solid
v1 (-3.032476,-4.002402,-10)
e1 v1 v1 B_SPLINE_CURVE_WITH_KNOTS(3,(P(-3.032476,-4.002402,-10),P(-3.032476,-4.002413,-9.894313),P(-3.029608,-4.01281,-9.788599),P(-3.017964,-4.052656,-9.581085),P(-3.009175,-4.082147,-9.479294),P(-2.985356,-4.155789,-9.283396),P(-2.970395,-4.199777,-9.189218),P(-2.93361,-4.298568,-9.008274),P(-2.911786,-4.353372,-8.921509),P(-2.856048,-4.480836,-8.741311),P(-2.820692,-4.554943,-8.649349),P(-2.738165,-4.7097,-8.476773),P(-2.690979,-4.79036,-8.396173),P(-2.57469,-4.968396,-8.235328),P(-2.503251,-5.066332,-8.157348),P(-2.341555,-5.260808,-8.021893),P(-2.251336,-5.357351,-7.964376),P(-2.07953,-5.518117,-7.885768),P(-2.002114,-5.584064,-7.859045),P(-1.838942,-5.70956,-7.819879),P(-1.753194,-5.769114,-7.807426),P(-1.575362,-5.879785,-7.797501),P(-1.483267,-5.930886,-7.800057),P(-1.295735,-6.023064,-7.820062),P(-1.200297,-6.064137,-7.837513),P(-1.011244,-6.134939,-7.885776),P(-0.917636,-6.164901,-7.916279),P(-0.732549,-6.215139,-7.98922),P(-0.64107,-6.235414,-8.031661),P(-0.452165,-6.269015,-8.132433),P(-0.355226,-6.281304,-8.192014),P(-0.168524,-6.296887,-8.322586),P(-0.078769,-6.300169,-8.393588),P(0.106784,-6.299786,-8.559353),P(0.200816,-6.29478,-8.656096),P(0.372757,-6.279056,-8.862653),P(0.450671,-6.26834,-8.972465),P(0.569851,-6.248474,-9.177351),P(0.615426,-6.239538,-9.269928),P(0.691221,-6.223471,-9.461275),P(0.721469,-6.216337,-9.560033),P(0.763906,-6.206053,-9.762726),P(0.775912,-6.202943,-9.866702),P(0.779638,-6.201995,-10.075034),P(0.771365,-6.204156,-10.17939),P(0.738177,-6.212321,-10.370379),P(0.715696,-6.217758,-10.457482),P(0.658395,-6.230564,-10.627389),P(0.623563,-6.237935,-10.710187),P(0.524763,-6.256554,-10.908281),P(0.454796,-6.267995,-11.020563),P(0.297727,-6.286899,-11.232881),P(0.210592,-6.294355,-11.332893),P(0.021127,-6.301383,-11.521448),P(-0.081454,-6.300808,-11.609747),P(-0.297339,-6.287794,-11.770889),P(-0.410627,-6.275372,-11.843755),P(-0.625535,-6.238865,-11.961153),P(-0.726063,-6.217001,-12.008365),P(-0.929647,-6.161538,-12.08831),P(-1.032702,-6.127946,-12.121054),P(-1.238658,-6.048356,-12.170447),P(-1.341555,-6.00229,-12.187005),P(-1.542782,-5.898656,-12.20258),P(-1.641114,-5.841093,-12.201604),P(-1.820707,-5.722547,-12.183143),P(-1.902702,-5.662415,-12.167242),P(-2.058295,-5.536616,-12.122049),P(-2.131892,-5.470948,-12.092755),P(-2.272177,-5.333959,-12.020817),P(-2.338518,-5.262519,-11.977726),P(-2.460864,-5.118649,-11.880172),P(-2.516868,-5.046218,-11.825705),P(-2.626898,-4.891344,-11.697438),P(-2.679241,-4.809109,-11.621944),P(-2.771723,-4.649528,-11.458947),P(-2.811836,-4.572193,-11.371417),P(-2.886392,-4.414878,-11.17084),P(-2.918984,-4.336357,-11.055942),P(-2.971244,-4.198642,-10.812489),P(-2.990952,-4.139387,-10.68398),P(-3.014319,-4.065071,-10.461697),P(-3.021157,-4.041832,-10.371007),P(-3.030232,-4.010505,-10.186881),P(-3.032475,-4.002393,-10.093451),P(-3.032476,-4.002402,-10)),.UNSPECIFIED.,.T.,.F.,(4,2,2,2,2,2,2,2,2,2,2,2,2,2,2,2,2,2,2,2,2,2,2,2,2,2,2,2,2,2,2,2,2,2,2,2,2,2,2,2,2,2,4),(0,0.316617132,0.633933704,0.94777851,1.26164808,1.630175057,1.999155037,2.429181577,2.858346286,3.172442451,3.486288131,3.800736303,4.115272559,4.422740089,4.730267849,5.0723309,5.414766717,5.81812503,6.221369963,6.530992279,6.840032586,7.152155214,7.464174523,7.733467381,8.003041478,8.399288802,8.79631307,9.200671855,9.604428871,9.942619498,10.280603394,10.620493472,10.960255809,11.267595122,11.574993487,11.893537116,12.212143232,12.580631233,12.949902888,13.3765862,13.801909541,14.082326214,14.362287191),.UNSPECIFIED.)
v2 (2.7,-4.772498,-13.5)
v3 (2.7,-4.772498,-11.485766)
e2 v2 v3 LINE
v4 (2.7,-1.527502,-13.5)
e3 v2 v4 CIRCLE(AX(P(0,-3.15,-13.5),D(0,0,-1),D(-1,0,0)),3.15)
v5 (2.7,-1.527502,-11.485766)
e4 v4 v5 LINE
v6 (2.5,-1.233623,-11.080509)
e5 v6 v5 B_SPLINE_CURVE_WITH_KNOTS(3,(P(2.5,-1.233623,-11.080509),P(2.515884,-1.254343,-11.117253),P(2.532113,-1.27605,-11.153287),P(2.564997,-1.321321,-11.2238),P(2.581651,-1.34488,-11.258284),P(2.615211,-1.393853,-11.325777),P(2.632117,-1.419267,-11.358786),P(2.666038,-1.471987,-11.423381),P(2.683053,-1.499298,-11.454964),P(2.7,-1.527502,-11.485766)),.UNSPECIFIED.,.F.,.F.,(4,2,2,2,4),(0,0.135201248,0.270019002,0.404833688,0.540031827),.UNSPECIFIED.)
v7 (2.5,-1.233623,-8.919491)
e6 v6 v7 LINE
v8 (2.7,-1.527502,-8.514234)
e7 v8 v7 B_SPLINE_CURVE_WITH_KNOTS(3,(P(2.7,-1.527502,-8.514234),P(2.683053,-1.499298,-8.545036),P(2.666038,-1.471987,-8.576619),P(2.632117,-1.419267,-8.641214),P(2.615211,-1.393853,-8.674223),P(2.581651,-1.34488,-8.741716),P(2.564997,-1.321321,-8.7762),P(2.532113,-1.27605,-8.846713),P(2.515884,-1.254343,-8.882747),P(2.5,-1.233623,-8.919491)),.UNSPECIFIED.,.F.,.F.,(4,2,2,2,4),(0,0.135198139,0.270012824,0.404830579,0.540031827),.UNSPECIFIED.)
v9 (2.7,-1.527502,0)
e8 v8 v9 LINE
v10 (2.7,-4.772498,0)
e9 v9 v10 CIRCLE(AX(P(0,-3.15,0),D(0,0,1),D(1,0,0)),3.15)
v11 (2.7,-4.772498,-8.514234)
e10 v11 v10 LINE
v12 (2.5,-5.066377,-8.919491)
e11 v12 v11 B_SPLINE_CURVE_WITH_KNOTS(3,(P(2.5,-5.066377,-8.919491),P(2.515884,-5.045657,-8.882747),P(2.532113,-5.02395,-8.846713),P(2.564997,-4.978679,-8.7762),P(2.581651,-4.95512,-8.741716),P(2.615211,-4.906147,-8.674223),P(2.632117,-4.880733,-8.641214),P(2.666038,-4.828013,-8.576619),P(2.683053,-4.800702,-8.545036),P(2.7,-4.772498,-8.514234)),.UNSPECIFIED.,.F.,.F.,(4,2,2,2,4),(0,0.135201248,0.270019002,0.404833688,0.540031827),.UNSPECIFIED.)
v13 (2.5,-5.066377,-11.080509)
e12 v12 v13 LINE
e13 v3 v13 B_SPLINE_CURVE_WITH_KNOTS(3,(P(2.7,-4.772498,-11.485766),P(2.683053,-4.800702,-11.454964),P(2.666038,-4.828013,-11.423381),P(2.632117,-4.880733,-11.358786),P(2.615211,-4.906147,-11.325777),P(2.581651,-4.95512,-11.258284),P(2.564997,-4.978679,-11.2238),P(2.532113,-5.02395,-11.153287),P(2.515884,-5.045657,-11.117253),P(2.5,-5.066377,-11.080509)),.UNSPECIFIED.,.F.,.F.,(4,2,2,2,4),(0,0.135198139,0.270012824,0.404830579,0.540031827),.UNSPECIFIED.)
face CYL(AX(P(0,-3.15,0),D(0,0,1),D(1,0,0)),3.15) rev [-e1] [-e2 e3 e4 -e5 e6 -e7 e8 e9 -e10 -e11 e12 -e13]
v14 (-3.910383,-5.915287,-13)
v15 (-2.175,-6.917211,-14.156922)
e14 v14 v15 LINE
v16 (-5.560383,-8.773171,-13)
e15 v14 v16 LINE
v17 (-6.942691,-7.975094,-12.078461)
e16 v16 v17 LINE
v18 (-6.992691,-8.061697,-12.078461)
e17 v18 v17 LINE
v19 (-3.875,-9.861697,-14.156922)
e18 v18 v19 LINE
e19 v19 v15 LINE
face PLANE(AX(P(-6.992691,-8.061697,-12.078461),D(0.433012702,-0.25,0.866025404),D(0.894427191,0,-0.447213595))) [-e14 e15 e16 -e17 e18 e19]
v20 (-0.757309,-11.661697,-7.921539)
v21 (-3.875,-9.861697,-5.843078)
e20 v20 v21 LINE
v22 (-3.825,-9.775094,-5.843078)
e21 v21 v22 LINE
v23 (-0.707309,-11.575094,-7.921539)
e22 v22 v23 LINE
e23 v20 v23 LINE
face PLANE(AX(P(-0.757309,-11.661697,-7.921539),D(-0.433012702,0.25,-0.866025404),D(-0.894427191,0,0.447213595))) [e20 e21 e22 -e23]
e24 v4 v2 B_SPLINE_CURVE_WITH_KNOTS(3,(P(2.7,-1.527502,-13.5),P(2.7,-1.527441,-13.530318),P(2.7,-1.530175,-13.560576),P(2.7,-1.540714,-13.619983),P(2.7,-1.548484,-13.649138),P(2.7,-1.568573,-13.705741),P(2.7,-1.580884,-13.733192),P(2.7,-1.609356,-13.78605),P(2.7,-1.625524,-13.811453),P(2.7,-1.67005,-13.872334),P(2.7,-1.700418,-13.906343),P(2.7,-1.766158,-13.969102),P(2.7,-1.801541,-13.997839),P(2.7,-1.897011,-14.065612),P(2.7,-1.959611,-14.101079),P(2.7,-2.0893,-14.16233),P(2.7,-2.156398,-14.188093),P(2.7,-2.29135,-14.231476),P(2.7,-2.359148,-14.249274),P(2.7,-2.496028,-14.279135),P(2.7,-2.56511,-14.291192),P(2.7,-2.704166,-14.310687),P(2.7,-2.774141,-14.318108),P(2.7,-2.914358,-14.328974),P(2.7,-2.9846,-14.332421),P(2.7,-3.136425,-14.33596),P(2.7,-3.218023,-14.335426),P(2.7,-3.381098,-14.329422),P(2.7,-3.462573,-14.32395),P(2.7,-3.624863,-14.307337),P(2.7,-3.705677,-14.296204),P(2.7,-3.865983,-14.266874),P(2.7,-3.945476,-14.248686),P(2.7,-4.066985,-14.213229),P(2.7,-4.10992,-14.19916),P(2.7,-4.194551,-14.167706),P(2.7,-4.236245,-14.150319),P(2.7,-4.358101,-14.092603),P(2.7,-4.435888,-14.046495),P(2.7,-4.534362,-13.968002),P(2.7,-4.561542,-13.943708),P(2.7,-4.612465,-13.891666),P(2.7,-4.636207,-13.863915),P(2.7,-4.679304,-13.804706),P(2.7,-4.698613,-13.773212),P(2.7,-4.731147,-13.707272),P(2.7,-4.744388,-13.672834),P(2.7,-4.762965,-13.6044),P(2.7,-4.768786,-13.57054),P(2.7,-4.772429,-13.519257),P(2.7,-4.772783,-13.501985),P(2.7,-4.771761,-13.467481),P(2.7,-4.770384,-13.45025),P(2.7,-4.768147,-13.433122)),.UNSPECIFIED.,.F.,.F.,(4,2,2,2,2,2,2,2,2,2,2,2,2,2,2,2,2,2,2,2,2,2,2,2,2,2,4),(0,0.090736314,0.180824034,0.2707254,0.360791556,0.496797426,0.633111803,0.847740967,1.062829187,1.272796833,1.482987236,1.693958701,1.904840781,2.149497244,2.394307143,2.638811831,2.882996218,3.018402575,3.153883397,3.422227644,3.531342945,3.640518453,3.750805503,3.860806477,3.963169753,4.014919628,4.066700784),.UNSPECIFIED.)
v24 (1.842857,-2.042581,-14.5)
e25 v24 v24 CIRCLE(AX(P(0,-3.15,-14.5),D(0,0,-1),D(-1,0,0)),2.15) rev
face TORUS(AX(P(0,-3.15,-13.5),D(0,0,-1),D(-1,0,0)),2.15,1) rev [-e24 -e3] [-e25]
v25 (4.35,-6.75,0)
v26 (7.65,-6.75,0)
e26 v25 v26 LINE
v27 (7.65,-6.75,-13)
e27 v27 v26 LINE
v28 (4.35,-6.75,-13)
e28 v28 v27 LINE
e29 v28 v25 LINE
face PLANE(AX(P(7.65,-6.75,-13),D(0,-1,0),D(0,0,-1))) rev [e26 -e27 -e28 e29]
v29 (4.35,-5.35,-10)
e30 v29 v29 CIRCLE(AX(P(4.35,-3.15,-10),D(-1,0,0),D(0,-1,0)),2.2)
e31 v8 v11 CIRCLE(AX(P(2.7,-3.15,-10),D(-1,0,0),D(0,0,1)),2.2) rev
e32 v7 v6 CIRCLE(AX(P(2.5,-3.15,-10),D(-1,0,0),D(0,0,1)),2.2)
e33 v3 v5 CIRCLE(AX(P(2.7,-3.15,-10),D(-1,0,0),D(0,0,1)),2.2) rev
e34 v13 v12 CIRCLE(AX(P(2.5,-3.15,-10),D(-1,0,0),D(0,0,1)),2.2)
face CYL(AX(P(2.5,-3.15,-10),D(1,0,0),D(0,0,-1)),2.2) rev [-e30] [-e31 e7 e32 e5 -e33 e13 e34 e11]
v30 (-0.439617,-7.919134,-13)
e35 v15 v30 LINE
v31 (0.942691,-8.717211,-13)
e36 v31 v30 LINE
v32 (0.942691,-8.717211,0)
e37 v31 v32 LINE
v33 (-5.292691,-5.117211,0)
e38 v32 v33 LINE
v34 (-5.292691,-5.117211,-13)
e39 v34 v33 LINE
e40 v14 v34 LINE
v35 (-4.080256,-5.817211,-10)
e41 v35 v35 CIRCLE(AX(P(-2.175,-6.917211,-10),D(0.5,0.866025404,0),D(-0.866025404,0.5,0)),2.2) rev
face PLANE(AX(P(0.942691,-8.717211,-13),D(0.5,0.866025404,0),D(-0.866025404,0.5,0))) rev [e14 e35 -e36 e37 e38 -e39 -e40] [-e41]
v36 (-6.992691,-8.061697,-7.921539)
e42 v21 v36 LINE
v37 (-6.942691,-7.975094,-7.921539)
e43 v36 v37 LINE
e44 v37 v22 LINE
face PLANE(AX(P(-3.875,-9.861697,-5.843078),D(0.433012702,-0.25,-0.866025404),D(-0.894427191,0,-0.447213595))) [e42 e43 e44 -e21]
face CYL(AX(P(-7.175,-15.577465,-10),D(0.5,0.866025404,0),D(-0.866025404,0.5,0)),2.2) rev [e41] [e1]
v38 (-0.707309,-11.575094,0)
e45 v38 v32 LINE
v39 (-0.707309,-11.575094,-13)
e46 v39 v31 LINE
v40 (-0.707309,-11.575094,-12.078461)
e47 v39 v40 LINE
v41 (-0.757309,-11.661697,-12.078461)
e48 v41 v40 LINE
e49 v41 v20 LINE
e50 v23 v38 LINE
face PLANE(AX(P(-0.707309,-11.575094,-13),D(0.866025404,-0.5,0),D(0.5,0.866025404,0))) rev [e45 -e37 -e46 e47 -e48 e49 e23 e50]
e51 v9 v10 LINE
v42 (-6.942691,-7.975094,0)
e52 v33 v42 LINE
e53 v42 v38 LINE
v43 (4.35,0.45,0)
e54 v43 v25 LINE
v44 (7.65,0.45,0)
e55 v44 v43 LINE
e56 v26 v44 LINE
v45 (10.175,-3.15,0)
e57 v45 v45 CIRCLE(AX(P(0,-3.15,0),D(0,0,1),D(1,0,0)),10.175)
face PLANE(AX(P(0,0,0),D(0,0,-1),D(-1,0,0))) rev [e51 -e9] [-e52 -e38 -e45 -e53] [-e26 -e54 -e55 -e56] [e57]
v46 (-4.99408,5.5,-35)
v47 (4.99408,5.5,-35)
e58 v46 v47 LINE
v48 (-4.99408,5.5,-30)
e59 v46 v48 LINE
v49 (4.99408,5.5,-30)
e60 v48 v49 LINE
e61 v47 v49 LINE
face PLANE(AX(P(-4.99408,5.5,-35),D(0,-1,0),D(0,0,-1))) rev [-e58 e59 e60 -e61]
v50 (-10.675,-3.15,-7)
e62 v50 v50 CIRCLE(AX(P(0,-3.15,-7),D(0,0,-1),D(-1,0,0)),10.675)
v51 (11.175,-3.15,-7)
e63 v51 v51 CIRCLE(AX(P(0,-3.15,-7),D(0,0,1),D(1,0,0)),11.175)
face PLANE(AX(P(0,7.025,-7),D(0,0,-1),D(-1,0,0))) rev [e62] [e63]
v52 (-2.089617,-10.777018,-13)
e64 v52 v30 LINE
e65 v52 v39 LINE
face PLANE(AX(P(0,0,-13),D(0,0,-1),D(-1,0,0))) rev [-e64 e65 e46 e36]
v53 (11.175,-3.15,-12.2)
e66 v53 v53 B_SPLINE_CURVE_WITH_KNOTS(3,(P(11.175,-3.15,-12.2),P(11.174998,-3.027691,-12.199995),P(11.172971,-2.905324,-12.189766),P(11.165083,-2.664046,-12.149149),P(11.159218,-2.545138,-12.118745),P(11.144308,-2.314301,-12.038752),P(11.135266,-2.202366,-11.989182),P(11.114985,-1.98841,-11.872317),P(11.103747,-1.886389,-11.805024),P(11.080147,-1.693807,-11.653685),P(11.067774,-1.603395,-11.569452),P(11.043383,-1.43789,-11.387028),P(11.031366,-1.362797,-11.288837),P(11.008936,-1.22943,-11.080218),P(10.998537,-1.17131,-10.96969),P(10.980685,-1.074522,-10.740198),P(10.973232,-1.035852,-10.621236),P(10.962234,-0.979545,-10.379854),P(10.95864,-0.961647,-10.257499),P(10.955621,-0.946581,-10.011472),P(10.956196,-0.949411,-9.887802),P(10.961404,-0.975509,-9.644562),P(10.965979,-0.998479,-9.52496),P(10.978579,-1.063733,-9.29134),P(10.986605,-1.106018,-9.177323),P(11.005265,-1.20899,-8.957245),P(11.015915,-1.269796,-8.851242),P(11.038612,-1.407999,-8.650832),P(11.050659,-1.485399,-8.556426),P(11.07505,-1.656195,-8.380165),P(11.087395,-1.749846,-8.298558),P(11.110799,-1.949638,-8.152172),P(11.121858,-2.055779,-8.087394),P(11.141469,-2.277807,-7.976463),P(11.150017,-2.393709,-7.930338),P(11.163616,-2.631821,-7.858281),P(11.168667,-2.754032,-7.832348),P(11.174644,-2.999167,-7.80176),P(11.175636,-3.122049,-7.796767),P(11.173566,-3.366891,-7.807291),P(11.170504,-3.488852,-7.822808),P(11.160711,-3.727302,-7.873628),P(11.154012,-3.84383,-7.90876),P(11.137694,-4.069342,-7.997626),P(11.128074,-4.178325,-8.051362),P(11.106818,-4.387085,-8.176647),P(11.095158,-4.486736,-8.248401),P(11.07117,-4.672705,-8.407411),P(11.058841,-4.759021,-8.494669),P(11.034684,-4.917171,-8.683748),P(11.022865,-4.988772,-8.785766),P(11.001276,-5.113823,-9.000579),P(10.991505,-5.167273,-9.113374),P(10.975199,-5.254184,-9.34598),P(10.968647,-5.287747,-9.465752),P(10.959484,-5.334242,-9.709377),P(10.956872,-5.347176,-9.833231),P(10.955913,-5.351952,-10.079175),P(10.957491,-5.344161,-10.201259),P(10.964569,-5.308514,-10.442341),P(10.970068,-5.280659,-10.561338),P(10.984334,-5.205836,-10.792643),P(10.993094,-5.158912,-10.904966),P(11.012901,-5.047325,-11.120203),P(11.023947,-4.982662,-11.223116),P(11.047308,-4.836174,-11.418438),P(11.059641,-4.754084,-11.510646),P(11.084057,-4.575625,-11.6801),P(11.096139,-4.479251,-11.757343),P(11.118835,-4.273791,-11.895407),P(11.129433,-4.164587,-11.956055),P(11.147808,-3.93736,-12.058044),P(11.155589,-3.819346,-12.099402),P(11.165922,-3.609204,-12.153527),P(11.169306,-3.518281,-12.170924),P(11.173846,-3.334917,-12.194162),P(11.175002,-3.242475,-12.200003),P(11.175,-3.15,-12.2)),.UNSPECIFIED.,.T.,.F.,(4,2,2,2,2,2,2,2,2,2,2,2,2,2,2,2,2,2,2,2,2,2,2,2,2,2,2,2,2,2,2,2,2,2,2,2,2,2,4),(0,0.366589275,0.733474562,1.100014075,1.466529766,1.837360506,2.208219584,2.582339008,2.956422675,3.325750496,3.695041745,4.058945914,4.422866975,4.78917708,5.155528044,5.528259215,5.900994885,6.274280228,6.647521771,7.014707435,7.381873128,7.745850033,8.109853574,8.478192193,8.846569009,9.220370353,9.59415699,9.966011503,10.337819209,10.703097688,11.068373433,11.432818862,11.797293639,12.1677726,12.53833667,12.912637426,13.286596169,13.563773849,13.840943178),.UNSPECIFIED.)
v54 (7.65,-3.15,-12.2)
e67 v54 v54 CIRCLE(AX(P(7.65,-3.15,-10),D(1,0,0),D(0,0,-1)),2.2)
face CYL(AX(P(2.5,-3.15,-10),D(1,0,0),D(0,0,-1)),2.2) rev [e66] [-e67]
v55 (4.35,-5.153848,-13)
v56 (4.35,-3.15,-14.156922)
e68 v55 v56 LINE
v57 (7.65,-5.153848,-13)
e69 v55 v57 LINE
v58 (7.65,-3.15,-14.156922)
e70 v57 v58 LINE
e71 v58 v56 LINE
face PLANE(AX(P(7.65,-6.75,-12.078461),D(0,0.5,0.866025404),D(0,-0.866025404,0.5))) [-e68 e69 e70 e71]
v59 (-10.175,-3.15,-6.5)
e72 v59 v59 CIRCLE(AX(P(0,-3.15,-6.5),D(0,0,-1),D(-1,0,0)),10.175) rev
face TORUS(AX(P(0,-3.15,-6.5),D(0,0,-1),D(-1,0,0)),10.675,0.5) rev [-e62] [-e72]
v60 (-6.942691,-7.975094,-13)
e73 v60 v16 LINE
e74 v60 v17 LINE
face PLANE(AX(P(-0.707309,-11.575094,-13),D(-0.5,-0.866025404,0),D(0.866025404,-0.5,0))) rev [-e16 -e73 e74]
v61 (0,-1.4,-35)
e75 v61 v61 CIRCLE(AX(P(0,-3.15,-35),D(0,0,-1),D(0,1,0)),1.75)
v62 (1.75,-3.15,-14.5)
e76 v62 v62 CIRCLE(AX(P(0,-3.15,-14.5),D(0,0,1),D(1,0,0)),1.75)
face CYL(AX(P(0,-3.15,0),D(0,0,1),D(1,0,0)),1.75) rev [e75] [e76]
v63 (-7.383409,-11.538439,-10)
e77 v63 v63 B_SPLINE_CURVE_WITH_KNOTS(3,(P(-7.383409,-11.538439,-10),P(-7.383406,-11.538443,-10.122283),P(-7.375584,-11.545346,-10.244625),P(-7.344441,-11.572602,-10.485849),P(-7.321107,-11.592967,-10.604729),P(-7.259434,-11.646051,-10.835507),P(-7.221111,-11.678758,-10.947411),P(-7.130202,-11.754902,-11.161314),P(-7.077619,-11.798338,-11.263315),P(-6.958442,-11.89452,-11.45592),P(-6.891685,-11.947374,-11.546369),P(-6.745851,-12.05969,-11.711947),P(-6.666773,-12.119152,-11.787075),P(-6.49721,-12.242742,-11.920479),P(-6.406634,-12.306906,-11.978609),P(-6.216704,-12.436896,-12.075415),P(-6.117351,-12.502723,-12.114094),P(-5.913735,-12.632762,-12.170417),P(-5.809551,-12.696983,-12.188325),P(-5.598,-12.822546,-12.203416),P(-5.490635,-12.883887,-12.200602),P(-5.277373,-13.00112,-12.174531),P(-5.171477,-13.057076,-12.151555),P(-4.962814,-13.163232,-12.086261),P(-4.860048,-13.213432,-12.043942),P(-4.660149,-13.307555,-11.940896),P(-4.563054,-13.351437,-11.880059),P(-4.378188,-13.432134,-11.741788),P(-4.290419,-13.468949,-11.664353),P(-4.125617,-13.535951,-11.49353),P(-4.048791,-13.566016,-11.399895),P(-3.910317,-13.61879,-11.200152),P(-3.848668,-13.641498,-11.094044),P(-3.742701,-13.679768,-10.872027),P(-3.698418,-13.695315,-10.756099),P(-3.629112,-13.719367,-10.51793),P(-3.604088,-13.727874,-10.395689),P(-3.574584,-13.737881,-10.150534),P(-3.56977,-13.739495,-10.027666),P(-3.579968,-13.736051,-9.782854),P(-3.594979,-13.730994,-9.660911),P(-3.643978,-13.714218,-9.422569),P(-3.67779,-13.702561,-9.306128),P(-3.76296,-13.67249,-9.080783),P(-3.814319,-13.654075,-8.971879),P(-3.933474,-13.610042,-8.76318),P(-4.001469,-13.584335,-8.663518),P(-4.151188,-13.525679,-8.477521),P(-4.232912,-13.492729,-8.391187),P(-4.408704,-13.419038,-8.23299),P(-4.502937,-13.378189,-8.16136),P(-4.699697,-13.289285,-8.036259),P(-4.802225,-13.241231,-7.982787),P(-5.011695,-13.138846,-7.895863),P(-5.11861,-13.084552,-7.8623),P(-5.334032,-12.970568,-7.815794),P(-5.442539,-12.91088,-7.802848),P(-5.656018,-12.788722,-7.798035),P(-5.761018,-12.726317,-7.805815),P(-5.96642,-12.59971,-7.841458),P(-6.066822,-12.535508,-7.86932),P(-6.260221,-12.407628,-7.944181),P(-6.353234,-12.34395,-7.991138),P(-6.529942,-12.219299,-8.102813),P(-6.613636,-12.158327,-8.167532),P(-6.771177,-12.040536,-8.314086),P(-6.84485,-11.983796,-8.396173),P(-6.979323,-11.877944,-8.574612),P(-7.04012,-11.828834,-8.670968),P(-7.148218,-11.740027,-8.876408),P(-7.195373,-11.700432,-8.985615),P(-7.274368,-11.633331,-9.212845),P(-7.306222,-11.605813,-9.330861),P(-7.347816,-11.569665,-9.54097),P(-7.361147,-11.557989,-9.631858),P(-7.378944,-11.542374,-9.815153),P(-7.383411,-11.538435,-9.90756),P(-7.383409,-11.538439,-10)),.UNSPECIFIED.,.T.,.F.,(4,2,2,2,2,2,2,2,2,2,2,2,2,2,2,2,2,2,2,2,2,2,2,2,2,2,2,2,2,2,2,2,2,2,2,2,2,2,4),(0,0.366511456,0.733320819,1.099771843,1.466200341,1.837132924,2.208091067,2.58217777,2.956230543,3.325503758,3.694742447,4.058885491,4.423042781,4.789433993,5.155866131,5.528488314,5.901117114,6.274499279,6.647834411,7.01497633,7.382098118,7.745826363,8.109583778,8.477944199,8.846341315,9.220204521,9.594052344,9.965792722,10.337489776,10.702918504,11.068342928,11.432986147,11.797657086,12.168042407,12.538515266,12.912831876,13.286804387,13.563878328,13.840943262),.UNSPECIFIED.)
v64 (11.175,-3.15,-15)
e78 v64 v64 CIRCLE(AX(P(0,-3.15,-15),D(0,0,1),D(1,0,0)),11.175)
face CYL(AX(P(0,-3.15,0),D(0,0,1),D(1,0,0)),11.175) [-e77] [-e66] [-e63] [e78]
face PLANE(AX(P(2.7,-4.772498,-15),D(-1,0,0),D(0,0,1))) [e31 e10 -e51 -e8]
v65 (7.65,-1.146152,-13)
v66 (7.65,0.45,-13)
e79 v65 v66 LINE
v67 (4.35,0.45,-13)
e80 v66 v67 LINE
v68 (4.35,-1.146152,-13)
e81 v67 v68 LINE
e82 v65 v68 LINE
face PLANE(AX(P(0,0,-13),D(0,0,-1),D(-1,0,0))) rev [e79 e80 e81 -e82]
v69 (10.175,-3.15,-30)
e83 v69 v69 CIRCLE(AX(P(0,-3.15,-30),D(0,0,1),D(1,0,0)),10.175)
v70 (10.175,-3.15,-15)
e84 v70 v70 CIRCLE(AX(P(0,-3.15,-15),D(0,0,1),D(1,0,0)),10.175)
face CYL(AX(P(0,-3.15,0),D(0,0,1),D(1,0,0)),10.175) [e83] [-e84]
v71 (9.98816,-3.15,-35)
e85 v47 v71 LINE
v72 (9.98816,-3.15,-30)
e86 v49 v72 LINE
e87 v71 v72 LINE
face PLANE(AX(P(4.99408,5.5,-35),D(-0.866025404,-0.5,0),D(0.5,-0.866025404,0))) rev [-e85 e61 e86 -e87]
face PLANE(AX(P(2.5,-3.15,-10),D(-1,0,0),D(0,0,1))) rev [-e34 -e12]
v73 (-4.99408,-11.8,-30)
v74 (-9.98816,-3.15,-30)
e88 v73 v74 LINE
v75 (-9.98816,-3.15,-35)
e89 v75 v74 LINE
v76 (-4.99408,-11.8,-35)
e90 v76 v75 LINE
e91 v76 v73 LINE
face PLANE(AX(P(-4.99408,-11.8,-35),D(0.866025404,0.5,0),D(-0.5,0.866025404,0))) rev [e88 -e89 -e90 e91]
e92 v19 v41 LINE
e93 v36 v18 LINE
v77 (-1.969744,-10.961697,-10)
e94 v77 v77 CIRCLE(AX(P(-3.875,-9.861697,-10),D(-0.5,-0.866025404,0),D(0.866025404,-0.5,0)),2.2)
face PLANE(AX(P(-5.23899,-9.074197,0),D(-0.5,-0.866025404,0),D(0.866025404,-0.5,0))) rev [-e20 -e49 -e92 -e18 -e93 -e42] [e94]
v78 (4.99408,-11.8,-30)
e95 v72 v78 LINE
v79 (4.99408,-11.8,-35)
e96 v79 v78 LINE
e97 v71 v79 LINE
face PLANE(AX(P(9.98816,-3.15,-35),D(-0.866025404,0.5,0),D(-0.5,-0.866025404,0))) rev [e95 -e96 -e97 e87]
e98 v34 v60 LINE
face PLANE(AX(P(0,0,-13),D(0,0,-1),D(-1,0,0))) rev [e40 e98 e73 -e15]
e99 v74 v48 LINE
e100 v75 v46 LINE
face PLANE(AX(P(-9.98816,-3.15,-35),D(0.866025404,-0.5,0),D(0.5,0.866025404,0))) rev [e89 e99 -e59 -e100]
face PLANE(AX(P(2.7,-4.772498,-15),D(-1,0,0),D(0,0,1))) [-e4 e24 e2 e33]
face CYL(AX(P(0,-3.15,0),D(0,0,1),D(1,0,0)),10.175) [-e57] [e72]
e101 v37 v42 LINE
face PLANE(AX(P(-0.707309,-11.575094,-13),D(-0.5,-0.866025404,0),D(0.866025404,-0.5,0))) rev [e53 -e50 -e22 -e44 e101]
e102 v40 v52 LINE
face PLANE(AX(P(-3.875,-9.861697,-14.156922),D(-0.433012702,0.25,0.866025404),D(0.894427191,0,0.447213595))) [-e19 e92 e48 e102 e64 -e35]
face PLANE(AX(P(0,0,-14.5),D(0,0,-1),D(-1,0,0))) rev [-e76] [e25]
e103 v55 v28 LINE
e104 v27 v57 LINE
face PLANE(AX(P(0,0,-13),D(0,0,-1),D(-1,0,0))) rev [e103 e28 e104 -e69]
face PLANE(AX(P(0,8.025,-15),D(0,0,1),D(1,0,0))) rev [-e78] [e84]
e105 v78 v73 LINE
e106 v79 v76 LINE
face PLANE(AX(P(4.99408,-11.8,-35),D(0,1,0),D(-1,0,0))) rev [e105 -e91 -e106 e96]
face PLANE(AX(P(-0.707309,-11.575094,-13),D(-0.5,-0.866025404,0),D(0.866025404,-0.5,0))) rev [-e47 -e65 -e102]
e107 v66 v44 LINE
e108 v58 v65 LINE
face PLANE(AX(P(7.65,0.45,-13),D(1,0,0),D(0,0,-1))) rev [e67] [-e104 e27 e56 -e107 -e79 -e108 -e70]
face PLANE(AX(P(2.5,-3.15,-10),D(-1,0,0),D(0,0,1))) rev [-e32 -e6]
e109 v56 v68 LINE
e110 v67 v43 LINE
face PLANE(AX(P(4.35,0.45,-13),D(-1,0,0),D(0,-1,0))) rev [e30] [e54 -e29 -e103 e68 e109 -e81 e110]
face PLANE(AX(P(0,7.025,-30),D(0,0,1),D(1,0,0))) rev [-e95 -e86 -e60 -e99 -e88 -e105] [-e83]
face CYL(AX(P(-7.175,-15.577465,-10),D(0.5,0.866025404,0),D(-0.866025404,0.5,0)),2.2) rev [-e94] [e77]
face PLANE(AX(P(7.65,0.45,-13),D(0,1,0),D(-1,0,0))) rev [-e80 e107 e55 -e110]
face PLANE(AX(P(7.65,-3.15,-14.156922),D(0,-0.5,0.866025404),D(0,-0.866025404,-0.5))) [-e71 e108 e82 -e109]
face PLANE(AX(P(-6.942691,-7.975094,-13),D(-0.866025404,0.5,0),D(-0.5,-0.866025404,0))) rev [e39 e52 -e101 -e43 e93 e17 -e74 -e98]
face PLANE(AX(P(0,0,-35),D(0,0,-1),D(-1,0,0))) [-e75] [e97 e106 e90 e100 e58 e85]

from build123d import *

# Parameters (mm, degrees)
SKETCH_2_R               = 1.75
EXTRUDE_1_DEPTH          = 5
SKETCH_3_W               = 2.5
SKETCH_3_H               = 7.4
EXTRUDE_2_DEPTH          = 15
CUT_EXTRUDE_1_DEPTH      = 0.2
CUT_EXTRUDE_1_DEPTH_BACK = 12
SKETCH_4_R               = 2.2
SKETCH_9_W               = 3.3
SKETCH_9_H               = 7.2
CUT_EXTRUDE_5_DEPTH      = 13
CUT_EXTRUDE_6_DEPTH      = 3.3
CUT_EXTRUDE_7_DEPTH      = 10
CUT_EXTRUDE_7_DEPTH_BACK = 5
SKETCH_12_R              = 2.2
CUT_EXTRUDE_8_DEPTH      = 3.4
FILLET_2_R               = 0.5


with BuildPart() as part:
    # Эскиз1 → Повернуть1 (revolve)
    with BuildSketch(Plane(origin=(0, 0, 0), x_dir=(0, 0, -1), z_dir=(1, 0, 0)), mode=Mode.PRIVATE) as revolve_1_sk:
        Polygon((0, 0), (0, 7.025), (7, 7.025), (7, 8.025), (15, 8.025), (15, 7.025), (30, 7.025), (30, -1.4), (14.5, -1.4), (14.5, 0), align=None)
    revolve(revolve_1_sk.sketch.rotate(Axis((0, -3.15, 0), (0, 0, -1)), 90), axis=Axis((0, -3.15, 0), (0, 0, -1)))

    # Эскиз2 → Бобышка-Вытянуть1 (add)
    with BuildSketch(Plane(origin=(0, 0, -30), x_dir=(-1, 0, 0), z_dir=(0, 0, -1))):
        Polygon((4.994079828, 5.5), (-4.994079828, 5.5), (-9.988159657, -3.15), (-4.994079828, -11.8), (4.994079828, -11.8), (9.988159657, -3.15), align=None)
        with Locations(Location((0, -3.15, 0), (0, 0, 180))):
            Circle(SKETCH_2_R, mode=Mode.SUBTRACT)
    extrude(amount=EXTRUDE_1_DEPTH)

    # Эскиз3 → Бобышка-Вытянуть2 (add)
    with BuildSketch(Plane.XY):
        with BuildLine():
            Line((2.7, -4.772498074), (2.7, -1.527501926))
            ThreePointArc((2.7, -1.527501926), (3.15, -3.15), (2.7, -4.772498074))
        make_face()
        with Locations((5.7, -3.15)):
            Rectangle(SKETCH_3_W, SKETCH_3_H)
    extrude(amount=-EXTRUDE_2_DEPTH)

    # Эскиз4 → Вырез-Вытянуть1 (cut, two sides: drawn at the far end of the back side and taken through both)
    with BuildSketch(Plane.ZY.offset(-2.7).offset(-CUT_EXTRUDE_1_DEPTH_BACK)):
        with Locations(Location((-10, -3.15, 0), (0, 0, 180))):
            Circle(SKETCH_4_R)
    extrude(amount=CUT_EXTRUDE_1_DEPTH + CUT_EXTRUDE_1_DEPTH_BACK, mode=Mode.SUBTRACT)

    # Скругление1: read off the stored shape, not the designer's step
    # Скругление1 outline → Скругление1 (revolve)
    with BuildSketch(Plane.XZ.offset(3.15)):
        with BuildLine():
            Line((3.15, -14.5), (3.15, -13.5))
            ThreePointArc((3.15, -13.5), (2.857106781, -14.207106781), (2.15, -14.5))
            Line((2.15, -14.5), (3.15, -14.5))
        make_face()
    revolve(axis=Axis((0, -3.15, 0), (0, 0, 1)))

    # Эскиз9 → Вырез-Вытянуть5 (cut)
    with BuildSketch(Plane.XY):
        with Locations((6, -3.15)):
            Rectangle(SKETCH_9_W, SKETCH_9_H)
        Polygon((-6.942691454, -7.975094339), (-5.292691454, -5.117210506), (0.942691454, -8.717210506), (-0.707308546, -11.575094339), align=None)
    extrude(amount=-CUT_EXTRUDE_5_DEPTH, mode=Mode.SUBTRACT)

    # Эскиз10 → Вырез-Вытянуть6 (cut)
    with BuildSketch(Plane(origin=(4.35, 0, 0), x_dir=(0, 0, -1), z_dir=(1, 0, 0))):
        Polygon((5.843078062, -3.15), (7.921539031, -6.75), (12.078460969, -6.75), (14.156921938, -3.15), (12.078460969, 0.45), (7.921539031, 0.45), align=None)
    extrude(amount=CUT_EXTRUDE_6_DEPTH, mode=Mode.SUBTRACT)

    # Эскиз12 → Вырез-Вытянуть7 (cut, two sides: drawn at the far end of the back side and taken through both)
    with BuildSketch(Plane(origin=(-3.538990011, -6.129710506, 0), x_dir=(0.8660254037844364, -0.500000000000004, 0), z_dir=(-0.500000000000004, -0.8660254037844365, 0)).offset(-CUT_EXTRUDE_7_DEPTH_BACK)):
        with Locations(Location((1.575, -10, 0), (0, 0, 180))):
            Circle(SKETCH_12_R)
    extrude(amount=CUT_EXTRUDE_7_DEPTH + CUT_EXTRUDE_7_DEPTH_BACK, mode=Mode.SUBTRACT)

    # Эскиз13 → Вырез-Вытянуть8 (cut)
    with BuildSketch(Plane(origin=(-3.538990011, -6.129710506, 0), x_dir=(0.8660254037844364, -0.500000000000004, 0), z_dir=(-0.500000000000004, -0.8660254037844365, 0))):
        Polygon((-2.025, -7.921539031), (-2.025, -12.078460969), (1.575, -14.156921938), (5.175, -12.078460969), (5.175, -7.921539031), (1.575, -5.843078062), align=None)
    extrude(amount=CUT_EXTRUDE_8_DEPTH, mode=Mode.SUBTRACT)

    # Скругление2
    fillet_2_edges = [part.edges().sort_by_distance(p)[0] for p in [
        (-10.175, -3.15, -7),
    ]]
    fillet(fillet_2_edges, radius=FILLET_2_R)


solid = part.part
